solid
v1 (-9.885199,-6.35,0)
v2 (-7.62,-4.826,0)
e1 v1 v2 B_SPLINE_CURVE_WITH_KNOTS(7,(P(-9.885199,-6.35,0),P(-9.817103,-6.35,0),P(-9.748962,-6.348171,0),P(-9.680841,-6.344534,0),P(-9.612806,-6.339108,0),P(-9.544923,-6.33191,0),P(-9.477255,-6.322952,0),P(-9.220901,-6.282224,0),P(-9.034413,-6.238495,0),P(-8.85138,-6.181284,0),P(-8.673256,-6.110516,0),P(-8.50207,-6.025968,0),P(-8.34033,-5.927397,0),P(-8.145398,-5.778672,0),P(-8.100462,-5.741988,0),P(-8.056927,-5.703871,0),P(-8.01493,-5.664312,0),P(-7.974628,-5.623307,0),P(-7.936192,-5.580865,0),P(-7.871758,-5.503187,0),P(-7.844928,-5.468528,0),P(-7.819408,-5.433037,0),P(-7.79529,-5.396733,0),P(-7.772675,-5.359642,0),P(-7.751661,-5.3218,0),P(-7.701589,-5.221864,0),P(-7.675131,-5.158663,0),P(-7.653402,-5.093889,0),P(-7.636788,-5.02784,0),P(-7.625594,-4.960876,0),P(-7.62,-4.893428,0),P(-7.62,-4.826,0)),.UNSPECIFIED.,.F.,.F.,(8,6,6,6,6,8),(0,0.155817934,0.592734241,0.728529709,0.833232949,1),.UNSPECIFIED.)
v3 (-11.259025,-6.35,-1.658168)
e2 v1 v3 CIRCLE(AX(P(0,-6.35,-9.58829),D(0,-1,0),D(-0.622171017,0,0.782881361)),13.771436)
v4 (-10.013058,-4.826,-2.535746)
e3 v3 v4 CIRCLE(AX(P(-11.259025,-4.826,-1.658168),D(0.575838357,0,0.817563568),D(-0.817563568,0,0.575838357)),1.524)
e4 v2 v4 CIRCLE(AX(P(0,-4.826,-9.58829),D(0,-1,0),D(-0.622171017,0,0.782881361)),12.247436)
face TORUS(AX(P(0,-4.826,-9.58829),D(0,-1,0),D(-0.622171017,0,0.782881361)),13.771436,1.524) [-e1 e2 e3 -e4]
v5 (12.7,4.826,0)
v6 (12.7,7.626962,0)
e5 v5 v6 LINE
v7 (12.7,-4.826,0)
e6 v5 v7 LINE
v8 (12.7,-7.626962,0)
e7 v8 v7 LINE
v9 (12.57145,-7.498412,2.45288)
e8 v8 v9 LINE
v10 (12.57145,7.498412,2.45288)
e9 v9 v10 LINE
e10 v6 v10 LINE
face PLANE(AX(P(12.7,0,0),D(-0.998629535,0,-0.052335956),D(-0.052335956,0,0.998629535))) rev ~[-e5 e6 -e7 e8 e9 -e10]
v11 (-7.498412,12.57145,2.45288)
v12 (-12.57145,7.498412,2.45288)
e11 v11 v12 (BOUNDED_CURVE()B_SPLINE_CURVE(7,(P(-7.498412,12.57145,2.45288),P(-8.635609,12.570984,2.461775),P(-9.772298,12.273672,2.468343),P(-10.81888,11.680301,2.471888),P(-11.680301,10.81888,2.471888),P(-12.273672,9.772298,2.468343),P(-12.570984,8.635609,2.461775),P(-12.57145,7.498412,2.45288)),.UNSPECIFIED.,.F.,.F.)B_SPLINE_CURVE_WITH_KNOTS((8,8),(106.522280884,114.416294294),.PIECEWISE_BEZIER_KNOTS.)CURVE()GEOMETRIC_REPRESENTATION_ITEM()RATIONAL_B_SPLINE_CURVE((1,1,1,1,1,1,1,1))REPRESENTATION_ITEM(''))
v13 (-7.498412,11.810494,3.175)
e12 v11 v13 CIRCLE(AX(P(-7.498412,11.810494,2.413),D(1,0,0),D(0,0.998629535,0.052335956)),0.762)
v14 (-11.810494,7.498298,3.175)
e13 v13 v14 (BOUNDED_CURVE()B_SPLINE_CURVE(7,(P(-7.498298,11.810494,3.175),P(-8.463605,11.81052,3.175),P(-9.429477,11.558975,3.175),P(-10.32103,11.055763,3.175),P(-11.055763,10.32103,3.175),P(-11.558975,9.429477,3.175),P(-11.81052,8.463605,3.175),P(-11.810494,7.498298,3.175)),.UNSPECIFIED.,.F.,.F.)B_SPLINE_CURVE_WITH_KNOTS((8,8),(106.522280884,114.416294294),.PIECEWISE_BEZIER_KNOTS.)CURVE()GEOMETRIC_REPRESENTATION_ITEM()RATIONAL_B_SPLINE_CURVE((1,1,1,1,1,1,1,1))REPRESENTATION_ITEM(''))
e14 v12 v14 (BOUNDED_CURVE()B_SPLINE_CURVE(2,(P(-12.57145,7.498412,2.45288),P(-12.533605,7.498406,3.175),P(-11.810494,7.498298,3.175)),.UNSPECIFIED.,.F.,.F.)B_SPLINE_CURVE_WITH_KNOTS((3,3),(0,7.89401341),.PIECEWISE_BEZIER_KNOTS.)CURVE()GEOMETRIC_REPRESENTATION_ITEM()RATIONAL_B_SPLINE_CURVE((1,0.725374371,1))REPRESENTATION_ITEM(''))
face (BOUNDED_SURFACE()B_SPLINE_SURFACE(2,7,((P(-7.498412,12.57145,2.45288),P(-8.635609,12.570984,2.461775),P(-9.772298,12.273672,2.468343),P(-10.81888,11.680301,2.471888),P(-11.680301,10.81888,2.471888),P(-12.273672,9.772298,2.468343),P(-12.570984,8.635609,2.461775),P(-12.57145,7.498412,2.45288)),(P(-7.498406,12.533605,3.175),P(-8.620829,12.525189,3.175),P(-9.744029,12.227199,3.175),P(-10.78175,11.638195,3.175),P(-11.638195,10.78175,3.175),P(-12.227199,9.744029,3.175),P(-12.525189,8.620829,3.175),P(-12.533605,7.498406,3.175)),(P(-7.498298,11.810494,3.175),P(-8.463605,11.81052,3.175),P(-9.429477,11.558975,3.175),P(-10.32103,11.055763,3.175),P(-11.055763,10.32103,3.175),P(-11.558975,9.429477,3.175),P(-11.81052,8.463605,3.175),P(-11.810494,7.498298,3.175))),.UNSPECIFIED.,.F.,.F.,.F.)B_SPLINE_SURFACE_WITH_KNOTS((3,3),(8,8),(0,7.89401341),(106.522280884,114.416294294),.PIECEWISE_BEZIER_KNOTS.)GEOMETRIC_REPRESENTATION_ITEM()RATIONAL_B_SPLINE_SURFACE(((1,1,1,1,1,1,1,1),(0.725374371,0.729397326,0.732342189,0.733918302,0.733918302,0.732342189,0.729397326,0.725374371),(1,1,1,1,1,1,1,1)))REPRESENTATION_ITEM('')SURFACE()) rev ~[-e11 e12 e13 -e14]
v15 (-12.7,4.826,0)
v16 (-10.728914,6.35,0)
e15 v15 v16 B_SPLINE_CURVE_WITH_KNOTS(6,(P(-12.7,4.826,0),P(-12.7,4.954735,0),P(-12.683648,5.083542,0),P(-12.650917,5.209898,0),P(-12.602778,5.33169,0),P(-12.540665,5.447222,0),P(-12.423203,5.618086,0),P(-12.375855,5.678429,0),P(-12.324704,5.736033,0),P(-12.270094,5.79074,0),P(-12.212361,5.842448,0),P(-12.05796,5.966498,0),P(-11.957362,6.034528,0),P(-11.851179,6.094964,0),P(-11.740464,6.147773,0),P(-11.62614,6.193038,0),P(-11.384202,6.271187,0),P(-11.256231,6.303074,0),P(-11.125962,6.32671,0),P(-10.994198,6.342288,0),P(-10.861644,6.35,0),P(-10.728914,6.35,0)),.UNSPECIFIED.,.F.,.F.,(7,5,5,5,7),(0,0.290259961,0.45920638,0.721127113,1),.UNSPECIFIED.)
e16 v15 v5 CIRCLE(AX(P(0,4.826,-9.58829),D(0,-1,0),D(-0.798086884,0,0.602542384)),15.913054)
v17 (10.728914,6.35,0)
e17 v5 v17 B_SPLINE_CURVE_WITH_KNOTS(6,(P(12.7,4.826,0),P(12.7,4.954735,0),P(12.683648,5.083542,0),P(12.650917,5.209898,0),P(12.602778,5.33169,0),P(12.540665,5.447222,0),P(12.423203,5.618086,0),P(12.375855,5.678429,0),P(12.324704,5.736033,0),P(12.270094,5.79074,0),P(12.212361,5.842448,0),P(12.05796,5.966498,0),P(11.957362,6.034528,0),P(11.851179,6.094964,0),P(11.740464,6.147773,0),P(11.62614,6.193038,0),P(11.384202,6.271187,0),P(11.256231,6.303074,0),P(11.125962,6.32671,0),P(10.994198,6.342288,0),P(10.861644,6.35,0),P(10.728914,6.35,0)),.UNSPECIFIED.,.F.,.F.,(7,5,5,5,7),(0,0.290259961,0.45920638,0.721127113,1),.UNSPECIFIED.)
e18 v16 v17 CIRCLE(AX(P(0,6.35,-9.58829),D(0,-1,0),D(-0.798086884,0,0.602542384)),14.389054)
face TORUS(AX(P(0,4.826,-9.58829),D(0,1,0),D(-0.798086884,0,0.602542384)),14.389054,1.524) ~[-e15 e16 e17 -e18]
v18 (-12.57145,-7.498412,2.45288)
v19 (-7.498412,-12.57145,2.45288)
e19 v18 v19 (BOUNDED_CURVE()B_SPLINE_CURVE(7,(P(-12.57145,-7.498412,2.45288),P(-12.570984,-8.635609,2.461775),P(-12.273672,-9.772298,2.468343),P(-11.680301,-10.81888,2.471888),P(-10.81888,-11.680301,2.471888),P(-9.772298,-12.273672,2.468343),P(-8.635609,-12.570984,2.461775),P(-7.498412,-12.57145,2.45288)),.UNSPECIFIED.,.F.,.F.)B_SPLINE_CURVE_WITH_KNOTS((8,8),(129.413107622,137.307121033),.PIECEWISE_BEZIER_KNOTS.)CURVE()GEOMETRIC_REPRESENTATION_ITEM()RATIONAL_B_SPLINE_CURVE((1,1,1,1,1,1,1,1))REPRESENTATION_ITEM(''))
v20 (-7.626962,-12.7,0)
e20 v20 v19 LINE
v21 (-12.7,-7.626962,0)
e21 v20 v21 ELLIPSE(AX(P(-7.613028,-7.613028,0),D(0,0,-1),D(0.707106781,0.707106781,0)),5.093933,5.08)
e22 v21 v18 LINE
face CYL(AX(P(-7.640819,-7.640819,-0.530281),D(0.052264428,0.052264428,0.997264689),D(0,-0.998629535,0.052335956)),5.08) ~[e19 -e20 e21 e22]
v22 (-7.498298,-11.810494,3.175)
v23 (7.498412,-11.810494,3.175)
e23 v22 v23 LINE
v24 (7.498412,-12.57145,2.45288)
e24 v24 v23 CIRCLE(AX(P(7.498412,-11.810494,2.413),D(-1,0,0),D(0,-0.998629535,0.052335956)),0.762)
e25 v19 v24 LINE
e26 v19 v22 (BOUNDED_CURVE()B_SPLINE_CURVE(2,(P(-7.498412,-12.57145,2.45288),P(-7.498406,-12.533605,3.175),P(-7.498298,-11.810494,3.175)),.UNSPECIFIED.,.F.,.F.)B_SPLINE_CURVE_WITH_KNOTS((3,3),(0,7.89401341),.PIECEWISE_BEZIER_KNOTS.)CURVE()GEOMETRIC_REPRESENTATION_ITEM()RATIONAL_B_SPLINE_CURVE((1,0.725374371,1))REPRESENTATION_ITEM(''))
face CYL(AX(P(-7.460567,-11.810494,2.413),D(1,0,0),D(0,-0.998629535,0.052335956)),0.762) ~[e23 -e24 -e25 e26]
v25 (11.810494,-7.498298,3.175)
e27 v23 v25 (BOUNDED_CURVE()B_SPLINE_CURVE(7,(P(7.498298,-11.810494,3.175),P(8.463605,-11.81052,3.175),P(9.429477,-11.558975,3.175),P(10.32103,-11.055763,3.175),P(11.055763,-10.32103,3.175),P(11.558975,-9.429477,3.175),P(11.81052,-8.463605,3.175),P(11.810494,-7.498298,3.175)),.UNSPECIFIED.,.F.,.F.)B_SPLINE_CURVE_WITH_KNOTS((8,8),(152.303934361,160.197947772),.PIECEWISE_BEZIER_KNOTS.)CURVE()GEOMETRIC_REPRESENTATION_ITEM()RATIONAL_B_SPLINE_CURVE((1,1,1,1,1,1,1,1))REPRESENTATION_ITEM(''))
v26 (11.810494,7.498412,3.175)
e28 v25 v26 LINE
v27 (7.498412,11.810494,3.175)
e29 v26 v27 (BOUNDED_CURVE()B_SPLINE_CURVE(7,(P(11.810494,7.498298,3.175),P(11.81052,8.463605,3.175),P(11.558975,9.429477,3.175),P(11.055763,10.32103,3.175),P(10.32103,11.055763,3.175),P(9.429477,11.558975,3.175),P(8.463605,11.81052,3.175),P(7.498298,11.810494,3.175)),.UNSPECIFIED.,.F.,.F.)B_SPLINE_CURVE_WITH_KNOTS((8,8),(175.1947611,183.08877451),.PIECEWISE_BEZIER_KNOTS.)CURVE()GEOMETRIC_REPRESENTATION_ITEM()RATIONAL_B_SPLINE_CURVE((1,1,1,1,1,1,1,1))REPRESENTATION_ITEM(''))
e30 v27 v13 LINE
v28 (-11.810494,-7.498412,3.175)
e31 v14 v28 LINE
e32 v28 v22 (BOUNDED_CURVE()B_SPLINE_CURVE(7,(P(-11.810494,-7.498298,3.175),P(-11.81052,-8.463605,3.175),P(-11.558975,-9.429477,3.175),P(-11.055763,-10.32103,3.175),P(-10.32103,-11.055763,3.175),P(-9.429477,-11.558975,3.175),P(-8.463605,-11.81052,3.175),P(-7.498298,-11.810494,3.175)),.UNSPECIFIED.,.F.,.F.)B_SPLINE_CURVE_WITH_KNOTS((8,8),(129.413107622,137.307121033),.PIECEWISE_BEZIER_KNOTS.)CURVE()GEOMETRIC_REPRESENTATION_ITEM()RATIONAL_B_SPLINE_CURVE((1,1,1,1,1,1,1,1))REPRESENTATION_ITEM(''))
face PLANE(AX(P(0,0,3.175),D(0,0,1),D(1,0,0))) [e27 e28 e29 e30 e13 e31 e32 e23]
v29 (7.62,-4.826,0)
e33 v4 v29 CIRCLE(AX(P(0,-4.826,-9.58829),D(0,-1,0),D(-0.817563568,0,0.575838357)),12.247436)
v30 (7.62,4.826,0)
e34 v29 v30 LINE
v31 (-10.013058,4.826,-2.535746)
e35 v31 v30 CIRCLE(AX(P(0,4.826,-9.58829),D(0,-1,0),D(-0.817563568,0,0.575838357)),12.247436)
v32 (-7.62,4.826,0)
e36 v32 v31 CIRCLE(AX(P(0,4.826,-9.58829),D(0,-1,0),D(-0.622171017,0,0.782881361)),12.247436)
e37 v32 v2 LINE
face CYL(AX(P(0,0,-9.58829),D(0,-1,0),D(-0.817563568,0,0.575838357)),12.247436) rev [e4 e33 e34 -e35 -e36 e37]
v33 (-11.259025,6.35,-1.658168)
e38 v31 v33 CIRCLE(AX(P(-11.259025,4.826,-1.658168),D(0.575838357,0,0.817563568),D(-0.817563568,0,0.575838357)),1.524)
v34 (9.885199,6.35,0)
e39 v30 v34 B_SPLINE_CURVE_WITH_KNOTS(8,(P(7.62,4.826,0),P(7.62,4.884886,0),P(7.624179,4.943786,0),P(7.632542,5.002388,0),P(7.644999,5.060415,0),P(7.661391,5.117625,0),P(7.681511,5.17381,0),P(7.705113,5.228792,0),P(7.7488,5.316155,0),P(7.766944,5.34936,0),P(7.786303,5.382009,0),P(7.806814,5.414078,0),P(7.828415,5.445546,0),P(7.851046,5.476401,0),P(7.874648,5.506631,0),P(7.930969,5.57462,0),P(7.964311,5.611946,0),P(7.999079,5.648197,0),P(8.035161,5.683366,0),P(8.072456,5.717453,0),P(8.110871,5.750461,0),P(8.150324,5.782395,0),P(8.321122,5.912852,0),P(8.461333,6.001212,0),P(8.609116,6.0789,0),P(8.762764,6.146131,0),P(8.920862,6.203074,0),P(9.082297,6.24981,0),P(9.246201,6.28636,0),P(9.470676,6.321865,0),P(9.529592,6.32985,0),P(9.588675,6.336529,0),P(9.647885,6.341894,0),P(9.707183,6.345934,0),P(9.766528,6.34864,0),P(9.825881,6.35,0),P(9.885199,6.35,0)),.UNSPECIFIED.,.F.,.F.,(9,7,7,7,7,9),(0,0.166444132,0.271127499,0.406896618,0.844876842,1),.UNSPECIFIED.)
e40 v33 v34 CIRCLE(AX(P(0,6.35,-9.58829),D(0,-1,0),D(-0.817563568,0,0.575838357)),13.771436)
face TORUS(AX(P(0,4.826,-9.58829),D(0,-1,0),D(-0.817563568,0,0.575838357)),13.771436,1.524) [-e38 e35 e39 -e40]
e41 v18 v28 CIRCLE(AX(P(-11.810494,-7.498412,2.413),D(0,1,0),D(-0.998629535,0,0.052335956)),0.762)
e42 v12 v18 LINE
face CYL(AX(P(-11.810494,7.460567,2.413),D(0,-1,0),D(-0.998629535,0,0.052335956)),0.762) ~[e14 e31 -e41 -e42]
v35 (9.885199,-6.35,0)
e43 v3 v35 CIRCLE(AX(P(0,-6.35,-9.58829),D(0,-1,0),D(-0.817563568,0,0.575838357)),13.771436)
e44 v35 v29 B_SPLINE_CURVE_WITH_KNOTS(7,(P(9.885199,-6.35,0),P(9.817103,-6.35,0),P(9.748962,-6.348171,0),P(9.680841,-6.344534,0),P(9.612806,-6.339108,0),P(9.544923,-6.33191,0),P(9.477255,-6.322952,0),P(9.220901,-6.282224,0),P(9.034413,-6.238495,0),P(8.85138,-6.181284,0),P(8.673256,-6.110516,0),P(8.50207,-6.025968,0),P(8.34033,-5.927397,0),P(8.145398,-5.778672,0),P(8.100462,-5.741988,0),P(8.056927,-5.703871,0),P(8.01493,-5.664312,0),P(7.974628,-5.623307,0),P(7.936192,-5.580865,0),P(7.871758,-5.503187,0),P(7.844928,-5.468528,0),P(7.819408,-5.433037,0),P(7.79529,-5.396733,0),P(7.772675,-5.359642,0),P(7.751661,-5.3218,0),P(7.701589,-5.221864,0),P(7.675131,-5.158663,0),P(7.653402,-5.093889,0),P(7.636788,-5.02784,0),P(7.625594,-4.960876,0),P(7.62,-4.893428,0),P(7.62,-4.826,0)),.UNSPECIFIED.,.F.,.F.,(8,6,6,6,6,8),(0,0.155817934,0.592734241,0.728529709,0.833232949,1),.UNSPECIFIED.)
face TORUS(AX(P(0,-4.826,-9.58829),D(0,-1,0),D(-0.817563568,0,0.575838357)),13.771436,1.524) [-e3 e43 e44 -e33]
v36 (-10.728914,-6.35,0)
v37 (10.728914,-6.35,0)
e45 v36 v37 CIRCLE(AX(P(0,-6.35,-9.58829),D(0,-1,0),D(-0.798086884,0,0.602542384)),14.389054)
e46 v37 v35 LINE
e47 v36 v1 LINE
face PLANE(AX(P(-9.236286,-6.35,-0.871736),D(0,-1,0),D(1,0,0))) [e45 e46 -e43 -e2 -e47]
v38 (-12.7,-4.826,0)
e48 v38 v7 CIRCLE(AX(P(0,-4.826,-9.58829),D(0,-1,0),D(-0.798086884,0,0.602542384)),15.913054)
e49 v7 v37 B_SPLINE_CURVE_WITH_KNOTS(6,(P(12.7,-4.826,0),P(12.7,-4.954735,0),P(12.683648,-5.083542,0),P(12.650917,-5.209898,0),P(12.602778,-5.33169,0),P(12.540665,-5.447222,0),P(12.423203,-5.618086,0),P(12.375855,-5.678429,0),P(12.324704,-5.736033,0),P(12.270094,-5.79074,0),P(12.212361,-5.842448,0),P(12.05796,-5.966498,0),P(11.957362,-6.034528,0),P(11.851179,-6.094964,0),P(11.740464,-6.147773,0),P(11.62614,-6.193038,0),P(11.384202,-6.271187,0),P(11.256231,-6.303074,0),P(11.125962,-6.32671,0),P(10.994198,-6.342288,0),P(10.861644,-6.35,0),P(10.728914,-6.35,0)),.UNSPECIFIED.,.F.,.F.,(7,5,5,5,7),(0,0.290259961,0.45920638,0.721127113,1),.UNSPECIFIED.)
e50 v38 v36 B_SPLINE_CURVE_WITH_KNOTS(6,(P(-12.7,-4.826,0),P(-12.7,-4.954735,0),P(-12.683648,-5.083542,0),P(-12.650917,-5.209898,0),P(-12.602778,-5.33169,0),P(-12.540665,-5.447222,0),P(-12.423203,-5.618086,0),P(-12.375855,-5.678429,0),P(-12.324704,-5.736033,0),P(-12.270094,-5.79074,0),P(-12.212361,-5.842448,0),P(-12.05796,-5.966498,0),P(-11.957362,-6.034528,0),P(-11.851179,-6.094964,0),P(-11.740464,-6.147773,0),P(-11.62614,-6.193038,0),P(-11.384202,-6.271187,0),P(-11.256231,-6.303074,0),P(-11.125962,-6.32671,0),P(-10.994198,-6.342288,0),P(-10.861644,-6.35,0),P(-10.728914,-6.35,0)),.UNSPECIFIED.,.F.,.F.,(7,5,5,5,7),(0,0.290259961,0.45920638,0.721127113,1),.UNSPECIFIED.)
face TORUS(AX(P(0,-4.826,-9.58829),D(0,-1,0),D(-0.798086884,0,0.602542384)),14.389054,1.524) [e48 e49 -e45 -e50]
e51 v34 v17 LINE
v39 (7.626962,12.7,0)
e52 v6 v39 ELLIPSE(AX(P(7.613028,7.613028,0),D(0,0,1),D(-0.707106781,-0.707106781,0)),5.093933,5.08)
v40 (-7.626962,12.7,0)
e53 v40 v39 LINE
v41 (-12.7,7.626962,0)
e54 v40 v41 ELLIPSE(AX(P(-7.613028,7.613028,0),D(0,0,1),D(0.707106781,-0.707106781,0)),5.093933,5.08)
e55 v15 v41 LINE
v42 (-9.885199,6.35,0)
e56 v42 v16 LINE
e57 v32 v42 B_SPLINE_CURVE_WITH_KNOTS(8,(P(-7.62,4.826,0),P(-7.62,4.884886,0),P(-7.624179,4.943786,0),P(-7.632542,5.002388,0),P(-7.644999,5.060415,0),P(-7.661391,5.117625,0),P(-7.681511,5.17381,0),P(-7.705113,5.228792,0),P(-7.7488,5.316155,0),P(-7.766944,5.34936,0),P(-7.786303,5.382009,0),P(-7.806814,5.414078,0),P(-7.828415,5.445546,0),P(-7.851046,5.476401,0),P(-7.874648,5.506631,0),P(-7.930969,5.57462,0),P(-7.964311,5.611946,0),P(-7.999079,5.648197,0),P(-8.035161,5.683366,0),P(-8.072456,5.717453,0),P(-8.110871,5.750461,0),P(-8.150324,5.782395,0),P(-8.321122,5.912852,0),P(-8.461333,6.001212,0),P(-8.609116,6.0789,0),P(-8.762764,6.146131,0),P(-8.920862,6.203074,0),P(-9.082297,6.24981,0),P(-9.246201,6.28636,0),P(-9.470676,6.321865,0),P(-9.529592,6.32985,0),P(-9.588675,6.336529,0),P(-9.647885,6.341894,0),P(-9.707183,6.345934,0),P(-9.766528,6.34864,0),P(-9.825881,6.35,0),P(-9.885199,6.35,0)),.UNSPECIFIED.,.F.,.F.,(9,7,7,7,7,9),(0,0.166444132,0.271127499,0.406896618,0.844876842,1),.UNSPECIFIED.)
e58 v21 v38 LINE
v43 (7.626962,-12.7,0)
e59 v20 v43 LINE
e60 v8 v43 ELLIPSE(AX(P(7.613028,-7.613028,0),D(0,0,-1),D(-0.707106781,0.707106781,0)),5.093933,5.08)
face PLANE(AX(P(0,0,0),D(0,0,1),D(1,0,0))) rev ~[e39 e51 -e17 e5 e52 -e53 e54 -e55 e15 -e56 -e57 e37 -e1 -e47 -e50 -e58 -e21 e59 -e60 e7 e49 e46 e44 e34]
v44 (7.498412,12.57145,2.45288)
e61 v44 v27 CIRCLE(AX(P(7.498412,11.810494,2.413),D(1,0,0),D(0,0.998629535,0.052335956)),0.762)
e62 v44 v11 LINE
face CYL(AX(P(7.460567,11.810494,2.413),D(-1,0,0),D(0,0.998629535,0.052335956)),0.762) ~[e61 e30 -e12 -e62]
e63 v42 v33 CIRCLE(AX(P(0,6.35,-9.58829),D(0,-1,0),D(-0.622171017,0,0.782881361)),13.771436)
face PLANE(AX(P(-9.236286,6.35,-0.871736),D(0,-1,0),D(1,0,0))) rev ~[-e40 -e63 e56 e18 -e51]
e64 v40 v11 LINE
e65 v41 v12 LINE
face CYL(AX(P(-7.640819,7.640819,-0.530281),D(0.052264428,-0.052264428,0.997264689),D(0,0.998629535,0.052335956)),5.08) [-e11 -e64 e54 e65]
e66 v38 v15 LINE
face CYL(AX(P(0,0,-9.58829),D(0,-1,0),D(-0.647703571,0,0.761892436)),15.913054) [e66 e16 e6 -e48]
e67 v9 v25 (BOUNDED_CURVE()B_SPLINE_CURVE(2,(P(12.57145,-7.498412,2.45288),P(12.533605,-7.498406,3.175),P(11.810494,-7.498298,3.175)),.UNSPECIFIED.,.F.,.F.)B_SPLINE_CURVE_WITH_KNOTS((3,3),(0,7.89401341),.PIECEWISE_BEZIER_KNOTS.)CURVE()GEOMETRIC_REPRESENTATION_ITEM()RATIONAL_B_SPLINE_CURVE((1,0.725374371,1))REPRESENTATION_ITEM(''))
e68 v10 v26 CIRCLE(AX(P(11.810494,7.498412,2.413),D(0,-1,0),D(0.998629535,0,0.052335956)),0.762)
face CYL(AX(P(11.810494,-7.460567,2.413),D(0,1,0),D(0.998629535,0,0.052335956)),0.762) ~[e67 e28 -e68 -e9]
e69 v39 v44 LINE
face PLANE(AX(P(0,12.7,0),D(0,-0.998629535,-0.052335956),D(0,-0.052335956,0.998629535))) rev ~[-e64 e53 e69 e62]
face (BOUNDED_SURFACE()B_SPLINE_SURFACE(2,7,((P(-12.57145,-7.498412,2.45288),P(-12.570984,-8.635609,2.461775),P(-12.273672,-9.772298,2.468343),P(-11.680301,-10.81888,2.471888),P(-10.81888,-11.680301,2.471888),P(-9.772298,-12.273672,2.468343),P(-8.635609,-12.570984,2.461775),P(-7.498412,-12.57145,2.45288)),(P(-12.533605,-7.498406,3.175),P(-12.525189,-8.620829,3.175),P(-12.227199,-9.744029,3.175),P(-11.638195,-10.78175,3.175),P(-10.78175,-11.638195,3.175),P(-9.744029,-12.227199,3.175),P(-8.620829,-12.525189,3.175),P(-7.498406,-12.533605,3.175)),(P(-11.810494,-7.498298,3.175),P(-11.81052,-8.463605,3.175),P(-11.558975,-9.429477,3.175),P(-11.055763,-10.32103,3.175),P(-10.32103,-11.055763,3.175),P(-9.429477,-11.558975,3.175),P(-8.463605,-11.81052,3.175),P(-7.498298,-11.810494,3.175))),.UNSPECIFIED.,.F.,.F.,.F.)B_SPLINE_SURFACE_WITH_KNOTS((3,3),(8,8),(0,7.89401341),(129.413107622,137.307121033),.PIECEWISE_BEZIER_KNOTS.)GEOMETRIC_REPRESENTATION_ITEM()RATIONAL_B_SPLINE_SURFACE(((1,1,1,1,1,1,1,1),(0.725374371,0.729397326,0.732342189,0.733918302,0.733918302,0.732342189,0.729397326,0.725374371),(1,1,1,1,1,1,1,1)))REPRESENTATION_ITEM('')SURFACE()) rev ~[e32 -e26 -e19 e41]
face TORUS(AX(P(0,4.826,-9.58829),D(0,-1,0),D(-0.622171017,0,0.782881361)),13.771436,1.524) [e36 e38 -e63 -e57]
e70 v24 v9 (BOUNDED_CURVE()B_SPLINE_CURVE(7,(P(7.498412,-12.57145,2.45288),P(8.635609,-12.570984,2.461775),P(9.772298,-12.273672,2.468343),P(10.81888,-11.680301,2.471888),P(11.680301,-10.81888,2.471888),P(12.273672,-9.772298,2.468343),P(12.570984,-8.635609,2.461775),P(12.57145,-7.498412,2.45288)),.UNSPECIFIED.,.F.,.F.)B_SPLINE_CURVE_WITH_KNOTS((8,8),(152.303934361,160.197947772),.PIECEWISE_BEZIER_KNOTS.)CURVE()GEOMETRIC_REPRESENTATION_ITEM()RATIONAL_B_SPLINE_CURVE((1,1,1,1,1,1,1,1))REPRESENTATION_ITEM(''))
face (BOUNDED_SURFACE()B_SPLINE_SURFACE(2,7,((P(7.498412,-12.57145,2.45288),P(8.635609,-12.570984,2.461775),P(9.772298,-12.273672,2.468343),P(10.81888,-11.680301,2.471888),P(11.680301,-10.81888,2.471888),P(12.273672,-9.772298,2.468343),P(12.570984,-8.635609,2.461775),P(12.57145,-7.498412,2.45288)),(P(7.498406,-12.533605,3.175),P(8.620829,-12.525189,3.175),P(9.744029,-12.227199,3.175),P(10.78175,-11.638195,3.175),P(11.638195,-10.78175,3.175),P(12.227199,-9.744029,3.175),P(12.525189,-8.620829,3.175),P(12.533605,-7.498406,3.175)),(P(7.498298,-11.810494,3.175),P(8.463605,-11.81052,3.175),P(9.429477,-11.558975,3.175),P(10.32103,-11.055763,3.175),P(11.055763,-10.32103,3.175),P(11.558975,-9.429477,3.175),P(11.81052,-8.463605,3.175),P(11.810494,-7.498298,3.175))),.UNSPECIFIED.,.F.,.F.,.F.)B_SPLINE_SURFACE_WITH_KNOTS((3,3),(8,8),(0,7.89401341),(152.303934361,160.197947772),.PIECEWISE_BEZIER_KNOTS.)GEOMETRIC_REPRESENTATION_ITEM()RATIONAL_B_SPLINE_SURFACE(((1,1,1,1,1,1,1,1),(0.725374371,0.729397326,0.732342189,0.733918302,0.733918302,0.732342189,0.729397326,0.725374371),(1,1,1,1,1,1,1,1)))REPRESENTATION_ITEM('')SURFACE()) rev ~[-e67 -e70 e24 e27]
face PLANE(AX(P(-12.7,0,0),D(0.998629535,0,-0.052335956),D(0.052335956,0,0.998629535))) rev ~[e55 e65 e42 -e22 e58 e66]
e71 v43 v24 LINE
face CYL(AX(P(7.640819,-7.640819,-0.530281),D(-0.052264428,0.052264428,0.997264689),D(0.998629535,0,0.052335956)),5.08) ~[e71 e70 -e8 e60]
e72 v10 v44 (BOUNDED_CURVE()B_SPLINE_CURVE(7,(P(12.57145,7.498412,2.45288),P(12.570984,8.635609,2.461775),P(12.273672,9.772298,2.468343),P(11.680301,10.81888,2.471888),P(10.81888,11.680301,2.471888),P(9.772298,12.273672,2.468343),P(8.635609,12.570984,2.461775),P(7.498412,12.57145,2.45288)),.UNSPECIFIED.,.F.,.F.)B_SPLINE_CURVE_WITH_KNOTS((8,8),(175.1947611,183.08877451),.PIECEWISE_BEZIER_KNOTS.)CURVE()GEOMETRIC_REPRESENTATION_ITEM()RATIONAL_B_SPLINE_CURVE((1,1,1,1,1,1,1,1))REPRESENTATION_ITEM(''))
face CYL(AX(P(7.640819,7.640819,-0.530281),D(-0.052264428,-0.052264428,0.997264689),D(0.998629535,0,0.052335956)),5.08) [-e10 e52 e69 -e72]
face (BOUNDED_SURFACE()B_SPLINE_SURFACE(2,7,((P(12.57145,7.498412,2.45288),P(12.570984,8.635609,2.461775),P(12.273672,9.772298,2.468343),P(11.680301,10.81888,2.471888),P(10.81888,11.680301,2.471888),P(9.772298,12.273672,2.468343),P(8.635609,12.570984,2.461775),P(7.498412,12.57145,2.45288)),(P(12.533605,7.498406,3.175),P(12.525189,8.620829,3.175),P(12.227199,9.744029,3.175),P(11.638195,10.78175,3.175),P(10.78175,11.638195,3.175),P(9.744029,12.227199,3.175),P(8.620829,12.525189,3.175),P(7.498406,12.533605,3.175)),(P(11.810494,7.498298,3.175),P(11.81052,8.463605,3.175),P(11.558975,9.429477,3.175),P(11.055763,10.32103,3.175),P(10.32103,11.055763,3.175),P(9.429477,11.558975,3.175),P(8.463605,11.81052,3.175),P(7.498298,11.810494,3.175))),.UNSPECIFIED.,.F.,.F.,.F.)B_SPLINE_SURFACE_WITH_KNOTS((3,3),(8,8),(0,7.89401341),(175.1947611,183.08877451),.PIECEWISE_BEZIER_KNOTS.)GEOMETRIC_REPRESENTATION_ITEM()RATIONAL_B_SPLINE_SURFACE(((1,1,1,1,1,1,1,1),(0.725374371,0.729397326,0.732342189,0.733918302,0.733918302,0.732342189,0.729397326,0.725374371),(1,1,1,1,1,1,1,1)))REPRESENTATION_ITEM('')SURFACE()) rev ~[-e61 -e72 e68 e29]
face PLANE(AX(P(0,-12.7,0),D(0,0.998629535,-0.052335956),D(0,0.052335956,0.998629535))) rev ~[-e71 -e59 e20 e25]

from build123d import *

# Parameters (mm, degrees)
F0_W          = 25.4
F0_H          = 25.4
F1_DEPTH      = 3.175
F1_TAPER      = 3
F3_W          = 5.08
F3_H          = 12.7
F6_DEPTH      = 6.35
F6_DEPTH_BACK = 6.35
F7_R          = 5.08
F8_R          = 1.524
F9_R          = 0.762


with BuildPart() as f1:
    # F0 (on Top) → F1 (new body)
    with BuildSketch(Plane.XY):
        Rectangle(F0_W, F0_H)
    extrude(amount=F1_DEPTH, taper=F1_TAPER)

    # F4: sweep along a path in F2
    with BuildLine(Plane.XZ) as f4_path:
        ThreePointArc((-10.16, 0), (0, -23.5582897328), (10.16, 0))
    # F3 (on face) → F4 (sweep)
    with BuildSketch(Plane(origin=(0, 0, 0), x_dir=(1, 0, 0), z_dir=(0, 0, -1))):
        with Locations((10.16, 0)):
            Rectangle(F3_W, F3_H)
    sweep(path=f4_path.line)

    # F5 (on Front) → F6 (join, two sides)
    with BuildSketch(Plane.XZ) as f6_sk:
        with BuildLine():
            Line((-7.62, 0), (-10.16, 0))
            Line((-10.16, 0), (-10.0130578512, -2.535746045))
            ThreePointArc((-10.0130578512, -2.535746045), (-8.9072265211, -1.1822790439), (-7.62, 0))
        make_face()
    extrude(amount=F6_DEPTH)
    extrude(f6_sk.sketch, amount=-F6_DEPTH_BACK)

    # F7
    f7_edges = [f1.edges().sort_by_distance(p)[0] for p in [
        (12.616803, 12.616803, 1.5875),
        (-12.616803, 12.616803, 1.5875),
        (12.616803, -12.616803, 1.5875),
        (-12.616803, -12.616803, 1.5875),
    ]]
    fillet(f7_edges, radius=F7_R)

    # F8
    f8_edges = [f1.edges().sort_by_distance(p)[0] for p in [
        (0, -6.35, -21.835726),
        (0, 6.35, -21.835726),
        (0, 6.35, -25.501344),
        (0, -6.35, -25.501344),
    ]]
    fillet(f8_edges, radius=F8_R)

    # F9
    f9_edges = [f1.edges().sort_by_distance(p)[0] for p in [
        (0, 12.533605, 3.175),
        (11.048589, 11.048589, 3.175),
        (-11.048589, 11.048589, 3.175),
        (12.533605, 0, 3.175),
        (-12.533605, 0, 3.175),
        (11.048589, -11.048589, 3.175),
        (-11.048589, -11.048589, 3.175),
        (0, -12.533605, 3.175),
    ]]
    fillet(f9_edges, radius=F9_R)


solid = f1.part
